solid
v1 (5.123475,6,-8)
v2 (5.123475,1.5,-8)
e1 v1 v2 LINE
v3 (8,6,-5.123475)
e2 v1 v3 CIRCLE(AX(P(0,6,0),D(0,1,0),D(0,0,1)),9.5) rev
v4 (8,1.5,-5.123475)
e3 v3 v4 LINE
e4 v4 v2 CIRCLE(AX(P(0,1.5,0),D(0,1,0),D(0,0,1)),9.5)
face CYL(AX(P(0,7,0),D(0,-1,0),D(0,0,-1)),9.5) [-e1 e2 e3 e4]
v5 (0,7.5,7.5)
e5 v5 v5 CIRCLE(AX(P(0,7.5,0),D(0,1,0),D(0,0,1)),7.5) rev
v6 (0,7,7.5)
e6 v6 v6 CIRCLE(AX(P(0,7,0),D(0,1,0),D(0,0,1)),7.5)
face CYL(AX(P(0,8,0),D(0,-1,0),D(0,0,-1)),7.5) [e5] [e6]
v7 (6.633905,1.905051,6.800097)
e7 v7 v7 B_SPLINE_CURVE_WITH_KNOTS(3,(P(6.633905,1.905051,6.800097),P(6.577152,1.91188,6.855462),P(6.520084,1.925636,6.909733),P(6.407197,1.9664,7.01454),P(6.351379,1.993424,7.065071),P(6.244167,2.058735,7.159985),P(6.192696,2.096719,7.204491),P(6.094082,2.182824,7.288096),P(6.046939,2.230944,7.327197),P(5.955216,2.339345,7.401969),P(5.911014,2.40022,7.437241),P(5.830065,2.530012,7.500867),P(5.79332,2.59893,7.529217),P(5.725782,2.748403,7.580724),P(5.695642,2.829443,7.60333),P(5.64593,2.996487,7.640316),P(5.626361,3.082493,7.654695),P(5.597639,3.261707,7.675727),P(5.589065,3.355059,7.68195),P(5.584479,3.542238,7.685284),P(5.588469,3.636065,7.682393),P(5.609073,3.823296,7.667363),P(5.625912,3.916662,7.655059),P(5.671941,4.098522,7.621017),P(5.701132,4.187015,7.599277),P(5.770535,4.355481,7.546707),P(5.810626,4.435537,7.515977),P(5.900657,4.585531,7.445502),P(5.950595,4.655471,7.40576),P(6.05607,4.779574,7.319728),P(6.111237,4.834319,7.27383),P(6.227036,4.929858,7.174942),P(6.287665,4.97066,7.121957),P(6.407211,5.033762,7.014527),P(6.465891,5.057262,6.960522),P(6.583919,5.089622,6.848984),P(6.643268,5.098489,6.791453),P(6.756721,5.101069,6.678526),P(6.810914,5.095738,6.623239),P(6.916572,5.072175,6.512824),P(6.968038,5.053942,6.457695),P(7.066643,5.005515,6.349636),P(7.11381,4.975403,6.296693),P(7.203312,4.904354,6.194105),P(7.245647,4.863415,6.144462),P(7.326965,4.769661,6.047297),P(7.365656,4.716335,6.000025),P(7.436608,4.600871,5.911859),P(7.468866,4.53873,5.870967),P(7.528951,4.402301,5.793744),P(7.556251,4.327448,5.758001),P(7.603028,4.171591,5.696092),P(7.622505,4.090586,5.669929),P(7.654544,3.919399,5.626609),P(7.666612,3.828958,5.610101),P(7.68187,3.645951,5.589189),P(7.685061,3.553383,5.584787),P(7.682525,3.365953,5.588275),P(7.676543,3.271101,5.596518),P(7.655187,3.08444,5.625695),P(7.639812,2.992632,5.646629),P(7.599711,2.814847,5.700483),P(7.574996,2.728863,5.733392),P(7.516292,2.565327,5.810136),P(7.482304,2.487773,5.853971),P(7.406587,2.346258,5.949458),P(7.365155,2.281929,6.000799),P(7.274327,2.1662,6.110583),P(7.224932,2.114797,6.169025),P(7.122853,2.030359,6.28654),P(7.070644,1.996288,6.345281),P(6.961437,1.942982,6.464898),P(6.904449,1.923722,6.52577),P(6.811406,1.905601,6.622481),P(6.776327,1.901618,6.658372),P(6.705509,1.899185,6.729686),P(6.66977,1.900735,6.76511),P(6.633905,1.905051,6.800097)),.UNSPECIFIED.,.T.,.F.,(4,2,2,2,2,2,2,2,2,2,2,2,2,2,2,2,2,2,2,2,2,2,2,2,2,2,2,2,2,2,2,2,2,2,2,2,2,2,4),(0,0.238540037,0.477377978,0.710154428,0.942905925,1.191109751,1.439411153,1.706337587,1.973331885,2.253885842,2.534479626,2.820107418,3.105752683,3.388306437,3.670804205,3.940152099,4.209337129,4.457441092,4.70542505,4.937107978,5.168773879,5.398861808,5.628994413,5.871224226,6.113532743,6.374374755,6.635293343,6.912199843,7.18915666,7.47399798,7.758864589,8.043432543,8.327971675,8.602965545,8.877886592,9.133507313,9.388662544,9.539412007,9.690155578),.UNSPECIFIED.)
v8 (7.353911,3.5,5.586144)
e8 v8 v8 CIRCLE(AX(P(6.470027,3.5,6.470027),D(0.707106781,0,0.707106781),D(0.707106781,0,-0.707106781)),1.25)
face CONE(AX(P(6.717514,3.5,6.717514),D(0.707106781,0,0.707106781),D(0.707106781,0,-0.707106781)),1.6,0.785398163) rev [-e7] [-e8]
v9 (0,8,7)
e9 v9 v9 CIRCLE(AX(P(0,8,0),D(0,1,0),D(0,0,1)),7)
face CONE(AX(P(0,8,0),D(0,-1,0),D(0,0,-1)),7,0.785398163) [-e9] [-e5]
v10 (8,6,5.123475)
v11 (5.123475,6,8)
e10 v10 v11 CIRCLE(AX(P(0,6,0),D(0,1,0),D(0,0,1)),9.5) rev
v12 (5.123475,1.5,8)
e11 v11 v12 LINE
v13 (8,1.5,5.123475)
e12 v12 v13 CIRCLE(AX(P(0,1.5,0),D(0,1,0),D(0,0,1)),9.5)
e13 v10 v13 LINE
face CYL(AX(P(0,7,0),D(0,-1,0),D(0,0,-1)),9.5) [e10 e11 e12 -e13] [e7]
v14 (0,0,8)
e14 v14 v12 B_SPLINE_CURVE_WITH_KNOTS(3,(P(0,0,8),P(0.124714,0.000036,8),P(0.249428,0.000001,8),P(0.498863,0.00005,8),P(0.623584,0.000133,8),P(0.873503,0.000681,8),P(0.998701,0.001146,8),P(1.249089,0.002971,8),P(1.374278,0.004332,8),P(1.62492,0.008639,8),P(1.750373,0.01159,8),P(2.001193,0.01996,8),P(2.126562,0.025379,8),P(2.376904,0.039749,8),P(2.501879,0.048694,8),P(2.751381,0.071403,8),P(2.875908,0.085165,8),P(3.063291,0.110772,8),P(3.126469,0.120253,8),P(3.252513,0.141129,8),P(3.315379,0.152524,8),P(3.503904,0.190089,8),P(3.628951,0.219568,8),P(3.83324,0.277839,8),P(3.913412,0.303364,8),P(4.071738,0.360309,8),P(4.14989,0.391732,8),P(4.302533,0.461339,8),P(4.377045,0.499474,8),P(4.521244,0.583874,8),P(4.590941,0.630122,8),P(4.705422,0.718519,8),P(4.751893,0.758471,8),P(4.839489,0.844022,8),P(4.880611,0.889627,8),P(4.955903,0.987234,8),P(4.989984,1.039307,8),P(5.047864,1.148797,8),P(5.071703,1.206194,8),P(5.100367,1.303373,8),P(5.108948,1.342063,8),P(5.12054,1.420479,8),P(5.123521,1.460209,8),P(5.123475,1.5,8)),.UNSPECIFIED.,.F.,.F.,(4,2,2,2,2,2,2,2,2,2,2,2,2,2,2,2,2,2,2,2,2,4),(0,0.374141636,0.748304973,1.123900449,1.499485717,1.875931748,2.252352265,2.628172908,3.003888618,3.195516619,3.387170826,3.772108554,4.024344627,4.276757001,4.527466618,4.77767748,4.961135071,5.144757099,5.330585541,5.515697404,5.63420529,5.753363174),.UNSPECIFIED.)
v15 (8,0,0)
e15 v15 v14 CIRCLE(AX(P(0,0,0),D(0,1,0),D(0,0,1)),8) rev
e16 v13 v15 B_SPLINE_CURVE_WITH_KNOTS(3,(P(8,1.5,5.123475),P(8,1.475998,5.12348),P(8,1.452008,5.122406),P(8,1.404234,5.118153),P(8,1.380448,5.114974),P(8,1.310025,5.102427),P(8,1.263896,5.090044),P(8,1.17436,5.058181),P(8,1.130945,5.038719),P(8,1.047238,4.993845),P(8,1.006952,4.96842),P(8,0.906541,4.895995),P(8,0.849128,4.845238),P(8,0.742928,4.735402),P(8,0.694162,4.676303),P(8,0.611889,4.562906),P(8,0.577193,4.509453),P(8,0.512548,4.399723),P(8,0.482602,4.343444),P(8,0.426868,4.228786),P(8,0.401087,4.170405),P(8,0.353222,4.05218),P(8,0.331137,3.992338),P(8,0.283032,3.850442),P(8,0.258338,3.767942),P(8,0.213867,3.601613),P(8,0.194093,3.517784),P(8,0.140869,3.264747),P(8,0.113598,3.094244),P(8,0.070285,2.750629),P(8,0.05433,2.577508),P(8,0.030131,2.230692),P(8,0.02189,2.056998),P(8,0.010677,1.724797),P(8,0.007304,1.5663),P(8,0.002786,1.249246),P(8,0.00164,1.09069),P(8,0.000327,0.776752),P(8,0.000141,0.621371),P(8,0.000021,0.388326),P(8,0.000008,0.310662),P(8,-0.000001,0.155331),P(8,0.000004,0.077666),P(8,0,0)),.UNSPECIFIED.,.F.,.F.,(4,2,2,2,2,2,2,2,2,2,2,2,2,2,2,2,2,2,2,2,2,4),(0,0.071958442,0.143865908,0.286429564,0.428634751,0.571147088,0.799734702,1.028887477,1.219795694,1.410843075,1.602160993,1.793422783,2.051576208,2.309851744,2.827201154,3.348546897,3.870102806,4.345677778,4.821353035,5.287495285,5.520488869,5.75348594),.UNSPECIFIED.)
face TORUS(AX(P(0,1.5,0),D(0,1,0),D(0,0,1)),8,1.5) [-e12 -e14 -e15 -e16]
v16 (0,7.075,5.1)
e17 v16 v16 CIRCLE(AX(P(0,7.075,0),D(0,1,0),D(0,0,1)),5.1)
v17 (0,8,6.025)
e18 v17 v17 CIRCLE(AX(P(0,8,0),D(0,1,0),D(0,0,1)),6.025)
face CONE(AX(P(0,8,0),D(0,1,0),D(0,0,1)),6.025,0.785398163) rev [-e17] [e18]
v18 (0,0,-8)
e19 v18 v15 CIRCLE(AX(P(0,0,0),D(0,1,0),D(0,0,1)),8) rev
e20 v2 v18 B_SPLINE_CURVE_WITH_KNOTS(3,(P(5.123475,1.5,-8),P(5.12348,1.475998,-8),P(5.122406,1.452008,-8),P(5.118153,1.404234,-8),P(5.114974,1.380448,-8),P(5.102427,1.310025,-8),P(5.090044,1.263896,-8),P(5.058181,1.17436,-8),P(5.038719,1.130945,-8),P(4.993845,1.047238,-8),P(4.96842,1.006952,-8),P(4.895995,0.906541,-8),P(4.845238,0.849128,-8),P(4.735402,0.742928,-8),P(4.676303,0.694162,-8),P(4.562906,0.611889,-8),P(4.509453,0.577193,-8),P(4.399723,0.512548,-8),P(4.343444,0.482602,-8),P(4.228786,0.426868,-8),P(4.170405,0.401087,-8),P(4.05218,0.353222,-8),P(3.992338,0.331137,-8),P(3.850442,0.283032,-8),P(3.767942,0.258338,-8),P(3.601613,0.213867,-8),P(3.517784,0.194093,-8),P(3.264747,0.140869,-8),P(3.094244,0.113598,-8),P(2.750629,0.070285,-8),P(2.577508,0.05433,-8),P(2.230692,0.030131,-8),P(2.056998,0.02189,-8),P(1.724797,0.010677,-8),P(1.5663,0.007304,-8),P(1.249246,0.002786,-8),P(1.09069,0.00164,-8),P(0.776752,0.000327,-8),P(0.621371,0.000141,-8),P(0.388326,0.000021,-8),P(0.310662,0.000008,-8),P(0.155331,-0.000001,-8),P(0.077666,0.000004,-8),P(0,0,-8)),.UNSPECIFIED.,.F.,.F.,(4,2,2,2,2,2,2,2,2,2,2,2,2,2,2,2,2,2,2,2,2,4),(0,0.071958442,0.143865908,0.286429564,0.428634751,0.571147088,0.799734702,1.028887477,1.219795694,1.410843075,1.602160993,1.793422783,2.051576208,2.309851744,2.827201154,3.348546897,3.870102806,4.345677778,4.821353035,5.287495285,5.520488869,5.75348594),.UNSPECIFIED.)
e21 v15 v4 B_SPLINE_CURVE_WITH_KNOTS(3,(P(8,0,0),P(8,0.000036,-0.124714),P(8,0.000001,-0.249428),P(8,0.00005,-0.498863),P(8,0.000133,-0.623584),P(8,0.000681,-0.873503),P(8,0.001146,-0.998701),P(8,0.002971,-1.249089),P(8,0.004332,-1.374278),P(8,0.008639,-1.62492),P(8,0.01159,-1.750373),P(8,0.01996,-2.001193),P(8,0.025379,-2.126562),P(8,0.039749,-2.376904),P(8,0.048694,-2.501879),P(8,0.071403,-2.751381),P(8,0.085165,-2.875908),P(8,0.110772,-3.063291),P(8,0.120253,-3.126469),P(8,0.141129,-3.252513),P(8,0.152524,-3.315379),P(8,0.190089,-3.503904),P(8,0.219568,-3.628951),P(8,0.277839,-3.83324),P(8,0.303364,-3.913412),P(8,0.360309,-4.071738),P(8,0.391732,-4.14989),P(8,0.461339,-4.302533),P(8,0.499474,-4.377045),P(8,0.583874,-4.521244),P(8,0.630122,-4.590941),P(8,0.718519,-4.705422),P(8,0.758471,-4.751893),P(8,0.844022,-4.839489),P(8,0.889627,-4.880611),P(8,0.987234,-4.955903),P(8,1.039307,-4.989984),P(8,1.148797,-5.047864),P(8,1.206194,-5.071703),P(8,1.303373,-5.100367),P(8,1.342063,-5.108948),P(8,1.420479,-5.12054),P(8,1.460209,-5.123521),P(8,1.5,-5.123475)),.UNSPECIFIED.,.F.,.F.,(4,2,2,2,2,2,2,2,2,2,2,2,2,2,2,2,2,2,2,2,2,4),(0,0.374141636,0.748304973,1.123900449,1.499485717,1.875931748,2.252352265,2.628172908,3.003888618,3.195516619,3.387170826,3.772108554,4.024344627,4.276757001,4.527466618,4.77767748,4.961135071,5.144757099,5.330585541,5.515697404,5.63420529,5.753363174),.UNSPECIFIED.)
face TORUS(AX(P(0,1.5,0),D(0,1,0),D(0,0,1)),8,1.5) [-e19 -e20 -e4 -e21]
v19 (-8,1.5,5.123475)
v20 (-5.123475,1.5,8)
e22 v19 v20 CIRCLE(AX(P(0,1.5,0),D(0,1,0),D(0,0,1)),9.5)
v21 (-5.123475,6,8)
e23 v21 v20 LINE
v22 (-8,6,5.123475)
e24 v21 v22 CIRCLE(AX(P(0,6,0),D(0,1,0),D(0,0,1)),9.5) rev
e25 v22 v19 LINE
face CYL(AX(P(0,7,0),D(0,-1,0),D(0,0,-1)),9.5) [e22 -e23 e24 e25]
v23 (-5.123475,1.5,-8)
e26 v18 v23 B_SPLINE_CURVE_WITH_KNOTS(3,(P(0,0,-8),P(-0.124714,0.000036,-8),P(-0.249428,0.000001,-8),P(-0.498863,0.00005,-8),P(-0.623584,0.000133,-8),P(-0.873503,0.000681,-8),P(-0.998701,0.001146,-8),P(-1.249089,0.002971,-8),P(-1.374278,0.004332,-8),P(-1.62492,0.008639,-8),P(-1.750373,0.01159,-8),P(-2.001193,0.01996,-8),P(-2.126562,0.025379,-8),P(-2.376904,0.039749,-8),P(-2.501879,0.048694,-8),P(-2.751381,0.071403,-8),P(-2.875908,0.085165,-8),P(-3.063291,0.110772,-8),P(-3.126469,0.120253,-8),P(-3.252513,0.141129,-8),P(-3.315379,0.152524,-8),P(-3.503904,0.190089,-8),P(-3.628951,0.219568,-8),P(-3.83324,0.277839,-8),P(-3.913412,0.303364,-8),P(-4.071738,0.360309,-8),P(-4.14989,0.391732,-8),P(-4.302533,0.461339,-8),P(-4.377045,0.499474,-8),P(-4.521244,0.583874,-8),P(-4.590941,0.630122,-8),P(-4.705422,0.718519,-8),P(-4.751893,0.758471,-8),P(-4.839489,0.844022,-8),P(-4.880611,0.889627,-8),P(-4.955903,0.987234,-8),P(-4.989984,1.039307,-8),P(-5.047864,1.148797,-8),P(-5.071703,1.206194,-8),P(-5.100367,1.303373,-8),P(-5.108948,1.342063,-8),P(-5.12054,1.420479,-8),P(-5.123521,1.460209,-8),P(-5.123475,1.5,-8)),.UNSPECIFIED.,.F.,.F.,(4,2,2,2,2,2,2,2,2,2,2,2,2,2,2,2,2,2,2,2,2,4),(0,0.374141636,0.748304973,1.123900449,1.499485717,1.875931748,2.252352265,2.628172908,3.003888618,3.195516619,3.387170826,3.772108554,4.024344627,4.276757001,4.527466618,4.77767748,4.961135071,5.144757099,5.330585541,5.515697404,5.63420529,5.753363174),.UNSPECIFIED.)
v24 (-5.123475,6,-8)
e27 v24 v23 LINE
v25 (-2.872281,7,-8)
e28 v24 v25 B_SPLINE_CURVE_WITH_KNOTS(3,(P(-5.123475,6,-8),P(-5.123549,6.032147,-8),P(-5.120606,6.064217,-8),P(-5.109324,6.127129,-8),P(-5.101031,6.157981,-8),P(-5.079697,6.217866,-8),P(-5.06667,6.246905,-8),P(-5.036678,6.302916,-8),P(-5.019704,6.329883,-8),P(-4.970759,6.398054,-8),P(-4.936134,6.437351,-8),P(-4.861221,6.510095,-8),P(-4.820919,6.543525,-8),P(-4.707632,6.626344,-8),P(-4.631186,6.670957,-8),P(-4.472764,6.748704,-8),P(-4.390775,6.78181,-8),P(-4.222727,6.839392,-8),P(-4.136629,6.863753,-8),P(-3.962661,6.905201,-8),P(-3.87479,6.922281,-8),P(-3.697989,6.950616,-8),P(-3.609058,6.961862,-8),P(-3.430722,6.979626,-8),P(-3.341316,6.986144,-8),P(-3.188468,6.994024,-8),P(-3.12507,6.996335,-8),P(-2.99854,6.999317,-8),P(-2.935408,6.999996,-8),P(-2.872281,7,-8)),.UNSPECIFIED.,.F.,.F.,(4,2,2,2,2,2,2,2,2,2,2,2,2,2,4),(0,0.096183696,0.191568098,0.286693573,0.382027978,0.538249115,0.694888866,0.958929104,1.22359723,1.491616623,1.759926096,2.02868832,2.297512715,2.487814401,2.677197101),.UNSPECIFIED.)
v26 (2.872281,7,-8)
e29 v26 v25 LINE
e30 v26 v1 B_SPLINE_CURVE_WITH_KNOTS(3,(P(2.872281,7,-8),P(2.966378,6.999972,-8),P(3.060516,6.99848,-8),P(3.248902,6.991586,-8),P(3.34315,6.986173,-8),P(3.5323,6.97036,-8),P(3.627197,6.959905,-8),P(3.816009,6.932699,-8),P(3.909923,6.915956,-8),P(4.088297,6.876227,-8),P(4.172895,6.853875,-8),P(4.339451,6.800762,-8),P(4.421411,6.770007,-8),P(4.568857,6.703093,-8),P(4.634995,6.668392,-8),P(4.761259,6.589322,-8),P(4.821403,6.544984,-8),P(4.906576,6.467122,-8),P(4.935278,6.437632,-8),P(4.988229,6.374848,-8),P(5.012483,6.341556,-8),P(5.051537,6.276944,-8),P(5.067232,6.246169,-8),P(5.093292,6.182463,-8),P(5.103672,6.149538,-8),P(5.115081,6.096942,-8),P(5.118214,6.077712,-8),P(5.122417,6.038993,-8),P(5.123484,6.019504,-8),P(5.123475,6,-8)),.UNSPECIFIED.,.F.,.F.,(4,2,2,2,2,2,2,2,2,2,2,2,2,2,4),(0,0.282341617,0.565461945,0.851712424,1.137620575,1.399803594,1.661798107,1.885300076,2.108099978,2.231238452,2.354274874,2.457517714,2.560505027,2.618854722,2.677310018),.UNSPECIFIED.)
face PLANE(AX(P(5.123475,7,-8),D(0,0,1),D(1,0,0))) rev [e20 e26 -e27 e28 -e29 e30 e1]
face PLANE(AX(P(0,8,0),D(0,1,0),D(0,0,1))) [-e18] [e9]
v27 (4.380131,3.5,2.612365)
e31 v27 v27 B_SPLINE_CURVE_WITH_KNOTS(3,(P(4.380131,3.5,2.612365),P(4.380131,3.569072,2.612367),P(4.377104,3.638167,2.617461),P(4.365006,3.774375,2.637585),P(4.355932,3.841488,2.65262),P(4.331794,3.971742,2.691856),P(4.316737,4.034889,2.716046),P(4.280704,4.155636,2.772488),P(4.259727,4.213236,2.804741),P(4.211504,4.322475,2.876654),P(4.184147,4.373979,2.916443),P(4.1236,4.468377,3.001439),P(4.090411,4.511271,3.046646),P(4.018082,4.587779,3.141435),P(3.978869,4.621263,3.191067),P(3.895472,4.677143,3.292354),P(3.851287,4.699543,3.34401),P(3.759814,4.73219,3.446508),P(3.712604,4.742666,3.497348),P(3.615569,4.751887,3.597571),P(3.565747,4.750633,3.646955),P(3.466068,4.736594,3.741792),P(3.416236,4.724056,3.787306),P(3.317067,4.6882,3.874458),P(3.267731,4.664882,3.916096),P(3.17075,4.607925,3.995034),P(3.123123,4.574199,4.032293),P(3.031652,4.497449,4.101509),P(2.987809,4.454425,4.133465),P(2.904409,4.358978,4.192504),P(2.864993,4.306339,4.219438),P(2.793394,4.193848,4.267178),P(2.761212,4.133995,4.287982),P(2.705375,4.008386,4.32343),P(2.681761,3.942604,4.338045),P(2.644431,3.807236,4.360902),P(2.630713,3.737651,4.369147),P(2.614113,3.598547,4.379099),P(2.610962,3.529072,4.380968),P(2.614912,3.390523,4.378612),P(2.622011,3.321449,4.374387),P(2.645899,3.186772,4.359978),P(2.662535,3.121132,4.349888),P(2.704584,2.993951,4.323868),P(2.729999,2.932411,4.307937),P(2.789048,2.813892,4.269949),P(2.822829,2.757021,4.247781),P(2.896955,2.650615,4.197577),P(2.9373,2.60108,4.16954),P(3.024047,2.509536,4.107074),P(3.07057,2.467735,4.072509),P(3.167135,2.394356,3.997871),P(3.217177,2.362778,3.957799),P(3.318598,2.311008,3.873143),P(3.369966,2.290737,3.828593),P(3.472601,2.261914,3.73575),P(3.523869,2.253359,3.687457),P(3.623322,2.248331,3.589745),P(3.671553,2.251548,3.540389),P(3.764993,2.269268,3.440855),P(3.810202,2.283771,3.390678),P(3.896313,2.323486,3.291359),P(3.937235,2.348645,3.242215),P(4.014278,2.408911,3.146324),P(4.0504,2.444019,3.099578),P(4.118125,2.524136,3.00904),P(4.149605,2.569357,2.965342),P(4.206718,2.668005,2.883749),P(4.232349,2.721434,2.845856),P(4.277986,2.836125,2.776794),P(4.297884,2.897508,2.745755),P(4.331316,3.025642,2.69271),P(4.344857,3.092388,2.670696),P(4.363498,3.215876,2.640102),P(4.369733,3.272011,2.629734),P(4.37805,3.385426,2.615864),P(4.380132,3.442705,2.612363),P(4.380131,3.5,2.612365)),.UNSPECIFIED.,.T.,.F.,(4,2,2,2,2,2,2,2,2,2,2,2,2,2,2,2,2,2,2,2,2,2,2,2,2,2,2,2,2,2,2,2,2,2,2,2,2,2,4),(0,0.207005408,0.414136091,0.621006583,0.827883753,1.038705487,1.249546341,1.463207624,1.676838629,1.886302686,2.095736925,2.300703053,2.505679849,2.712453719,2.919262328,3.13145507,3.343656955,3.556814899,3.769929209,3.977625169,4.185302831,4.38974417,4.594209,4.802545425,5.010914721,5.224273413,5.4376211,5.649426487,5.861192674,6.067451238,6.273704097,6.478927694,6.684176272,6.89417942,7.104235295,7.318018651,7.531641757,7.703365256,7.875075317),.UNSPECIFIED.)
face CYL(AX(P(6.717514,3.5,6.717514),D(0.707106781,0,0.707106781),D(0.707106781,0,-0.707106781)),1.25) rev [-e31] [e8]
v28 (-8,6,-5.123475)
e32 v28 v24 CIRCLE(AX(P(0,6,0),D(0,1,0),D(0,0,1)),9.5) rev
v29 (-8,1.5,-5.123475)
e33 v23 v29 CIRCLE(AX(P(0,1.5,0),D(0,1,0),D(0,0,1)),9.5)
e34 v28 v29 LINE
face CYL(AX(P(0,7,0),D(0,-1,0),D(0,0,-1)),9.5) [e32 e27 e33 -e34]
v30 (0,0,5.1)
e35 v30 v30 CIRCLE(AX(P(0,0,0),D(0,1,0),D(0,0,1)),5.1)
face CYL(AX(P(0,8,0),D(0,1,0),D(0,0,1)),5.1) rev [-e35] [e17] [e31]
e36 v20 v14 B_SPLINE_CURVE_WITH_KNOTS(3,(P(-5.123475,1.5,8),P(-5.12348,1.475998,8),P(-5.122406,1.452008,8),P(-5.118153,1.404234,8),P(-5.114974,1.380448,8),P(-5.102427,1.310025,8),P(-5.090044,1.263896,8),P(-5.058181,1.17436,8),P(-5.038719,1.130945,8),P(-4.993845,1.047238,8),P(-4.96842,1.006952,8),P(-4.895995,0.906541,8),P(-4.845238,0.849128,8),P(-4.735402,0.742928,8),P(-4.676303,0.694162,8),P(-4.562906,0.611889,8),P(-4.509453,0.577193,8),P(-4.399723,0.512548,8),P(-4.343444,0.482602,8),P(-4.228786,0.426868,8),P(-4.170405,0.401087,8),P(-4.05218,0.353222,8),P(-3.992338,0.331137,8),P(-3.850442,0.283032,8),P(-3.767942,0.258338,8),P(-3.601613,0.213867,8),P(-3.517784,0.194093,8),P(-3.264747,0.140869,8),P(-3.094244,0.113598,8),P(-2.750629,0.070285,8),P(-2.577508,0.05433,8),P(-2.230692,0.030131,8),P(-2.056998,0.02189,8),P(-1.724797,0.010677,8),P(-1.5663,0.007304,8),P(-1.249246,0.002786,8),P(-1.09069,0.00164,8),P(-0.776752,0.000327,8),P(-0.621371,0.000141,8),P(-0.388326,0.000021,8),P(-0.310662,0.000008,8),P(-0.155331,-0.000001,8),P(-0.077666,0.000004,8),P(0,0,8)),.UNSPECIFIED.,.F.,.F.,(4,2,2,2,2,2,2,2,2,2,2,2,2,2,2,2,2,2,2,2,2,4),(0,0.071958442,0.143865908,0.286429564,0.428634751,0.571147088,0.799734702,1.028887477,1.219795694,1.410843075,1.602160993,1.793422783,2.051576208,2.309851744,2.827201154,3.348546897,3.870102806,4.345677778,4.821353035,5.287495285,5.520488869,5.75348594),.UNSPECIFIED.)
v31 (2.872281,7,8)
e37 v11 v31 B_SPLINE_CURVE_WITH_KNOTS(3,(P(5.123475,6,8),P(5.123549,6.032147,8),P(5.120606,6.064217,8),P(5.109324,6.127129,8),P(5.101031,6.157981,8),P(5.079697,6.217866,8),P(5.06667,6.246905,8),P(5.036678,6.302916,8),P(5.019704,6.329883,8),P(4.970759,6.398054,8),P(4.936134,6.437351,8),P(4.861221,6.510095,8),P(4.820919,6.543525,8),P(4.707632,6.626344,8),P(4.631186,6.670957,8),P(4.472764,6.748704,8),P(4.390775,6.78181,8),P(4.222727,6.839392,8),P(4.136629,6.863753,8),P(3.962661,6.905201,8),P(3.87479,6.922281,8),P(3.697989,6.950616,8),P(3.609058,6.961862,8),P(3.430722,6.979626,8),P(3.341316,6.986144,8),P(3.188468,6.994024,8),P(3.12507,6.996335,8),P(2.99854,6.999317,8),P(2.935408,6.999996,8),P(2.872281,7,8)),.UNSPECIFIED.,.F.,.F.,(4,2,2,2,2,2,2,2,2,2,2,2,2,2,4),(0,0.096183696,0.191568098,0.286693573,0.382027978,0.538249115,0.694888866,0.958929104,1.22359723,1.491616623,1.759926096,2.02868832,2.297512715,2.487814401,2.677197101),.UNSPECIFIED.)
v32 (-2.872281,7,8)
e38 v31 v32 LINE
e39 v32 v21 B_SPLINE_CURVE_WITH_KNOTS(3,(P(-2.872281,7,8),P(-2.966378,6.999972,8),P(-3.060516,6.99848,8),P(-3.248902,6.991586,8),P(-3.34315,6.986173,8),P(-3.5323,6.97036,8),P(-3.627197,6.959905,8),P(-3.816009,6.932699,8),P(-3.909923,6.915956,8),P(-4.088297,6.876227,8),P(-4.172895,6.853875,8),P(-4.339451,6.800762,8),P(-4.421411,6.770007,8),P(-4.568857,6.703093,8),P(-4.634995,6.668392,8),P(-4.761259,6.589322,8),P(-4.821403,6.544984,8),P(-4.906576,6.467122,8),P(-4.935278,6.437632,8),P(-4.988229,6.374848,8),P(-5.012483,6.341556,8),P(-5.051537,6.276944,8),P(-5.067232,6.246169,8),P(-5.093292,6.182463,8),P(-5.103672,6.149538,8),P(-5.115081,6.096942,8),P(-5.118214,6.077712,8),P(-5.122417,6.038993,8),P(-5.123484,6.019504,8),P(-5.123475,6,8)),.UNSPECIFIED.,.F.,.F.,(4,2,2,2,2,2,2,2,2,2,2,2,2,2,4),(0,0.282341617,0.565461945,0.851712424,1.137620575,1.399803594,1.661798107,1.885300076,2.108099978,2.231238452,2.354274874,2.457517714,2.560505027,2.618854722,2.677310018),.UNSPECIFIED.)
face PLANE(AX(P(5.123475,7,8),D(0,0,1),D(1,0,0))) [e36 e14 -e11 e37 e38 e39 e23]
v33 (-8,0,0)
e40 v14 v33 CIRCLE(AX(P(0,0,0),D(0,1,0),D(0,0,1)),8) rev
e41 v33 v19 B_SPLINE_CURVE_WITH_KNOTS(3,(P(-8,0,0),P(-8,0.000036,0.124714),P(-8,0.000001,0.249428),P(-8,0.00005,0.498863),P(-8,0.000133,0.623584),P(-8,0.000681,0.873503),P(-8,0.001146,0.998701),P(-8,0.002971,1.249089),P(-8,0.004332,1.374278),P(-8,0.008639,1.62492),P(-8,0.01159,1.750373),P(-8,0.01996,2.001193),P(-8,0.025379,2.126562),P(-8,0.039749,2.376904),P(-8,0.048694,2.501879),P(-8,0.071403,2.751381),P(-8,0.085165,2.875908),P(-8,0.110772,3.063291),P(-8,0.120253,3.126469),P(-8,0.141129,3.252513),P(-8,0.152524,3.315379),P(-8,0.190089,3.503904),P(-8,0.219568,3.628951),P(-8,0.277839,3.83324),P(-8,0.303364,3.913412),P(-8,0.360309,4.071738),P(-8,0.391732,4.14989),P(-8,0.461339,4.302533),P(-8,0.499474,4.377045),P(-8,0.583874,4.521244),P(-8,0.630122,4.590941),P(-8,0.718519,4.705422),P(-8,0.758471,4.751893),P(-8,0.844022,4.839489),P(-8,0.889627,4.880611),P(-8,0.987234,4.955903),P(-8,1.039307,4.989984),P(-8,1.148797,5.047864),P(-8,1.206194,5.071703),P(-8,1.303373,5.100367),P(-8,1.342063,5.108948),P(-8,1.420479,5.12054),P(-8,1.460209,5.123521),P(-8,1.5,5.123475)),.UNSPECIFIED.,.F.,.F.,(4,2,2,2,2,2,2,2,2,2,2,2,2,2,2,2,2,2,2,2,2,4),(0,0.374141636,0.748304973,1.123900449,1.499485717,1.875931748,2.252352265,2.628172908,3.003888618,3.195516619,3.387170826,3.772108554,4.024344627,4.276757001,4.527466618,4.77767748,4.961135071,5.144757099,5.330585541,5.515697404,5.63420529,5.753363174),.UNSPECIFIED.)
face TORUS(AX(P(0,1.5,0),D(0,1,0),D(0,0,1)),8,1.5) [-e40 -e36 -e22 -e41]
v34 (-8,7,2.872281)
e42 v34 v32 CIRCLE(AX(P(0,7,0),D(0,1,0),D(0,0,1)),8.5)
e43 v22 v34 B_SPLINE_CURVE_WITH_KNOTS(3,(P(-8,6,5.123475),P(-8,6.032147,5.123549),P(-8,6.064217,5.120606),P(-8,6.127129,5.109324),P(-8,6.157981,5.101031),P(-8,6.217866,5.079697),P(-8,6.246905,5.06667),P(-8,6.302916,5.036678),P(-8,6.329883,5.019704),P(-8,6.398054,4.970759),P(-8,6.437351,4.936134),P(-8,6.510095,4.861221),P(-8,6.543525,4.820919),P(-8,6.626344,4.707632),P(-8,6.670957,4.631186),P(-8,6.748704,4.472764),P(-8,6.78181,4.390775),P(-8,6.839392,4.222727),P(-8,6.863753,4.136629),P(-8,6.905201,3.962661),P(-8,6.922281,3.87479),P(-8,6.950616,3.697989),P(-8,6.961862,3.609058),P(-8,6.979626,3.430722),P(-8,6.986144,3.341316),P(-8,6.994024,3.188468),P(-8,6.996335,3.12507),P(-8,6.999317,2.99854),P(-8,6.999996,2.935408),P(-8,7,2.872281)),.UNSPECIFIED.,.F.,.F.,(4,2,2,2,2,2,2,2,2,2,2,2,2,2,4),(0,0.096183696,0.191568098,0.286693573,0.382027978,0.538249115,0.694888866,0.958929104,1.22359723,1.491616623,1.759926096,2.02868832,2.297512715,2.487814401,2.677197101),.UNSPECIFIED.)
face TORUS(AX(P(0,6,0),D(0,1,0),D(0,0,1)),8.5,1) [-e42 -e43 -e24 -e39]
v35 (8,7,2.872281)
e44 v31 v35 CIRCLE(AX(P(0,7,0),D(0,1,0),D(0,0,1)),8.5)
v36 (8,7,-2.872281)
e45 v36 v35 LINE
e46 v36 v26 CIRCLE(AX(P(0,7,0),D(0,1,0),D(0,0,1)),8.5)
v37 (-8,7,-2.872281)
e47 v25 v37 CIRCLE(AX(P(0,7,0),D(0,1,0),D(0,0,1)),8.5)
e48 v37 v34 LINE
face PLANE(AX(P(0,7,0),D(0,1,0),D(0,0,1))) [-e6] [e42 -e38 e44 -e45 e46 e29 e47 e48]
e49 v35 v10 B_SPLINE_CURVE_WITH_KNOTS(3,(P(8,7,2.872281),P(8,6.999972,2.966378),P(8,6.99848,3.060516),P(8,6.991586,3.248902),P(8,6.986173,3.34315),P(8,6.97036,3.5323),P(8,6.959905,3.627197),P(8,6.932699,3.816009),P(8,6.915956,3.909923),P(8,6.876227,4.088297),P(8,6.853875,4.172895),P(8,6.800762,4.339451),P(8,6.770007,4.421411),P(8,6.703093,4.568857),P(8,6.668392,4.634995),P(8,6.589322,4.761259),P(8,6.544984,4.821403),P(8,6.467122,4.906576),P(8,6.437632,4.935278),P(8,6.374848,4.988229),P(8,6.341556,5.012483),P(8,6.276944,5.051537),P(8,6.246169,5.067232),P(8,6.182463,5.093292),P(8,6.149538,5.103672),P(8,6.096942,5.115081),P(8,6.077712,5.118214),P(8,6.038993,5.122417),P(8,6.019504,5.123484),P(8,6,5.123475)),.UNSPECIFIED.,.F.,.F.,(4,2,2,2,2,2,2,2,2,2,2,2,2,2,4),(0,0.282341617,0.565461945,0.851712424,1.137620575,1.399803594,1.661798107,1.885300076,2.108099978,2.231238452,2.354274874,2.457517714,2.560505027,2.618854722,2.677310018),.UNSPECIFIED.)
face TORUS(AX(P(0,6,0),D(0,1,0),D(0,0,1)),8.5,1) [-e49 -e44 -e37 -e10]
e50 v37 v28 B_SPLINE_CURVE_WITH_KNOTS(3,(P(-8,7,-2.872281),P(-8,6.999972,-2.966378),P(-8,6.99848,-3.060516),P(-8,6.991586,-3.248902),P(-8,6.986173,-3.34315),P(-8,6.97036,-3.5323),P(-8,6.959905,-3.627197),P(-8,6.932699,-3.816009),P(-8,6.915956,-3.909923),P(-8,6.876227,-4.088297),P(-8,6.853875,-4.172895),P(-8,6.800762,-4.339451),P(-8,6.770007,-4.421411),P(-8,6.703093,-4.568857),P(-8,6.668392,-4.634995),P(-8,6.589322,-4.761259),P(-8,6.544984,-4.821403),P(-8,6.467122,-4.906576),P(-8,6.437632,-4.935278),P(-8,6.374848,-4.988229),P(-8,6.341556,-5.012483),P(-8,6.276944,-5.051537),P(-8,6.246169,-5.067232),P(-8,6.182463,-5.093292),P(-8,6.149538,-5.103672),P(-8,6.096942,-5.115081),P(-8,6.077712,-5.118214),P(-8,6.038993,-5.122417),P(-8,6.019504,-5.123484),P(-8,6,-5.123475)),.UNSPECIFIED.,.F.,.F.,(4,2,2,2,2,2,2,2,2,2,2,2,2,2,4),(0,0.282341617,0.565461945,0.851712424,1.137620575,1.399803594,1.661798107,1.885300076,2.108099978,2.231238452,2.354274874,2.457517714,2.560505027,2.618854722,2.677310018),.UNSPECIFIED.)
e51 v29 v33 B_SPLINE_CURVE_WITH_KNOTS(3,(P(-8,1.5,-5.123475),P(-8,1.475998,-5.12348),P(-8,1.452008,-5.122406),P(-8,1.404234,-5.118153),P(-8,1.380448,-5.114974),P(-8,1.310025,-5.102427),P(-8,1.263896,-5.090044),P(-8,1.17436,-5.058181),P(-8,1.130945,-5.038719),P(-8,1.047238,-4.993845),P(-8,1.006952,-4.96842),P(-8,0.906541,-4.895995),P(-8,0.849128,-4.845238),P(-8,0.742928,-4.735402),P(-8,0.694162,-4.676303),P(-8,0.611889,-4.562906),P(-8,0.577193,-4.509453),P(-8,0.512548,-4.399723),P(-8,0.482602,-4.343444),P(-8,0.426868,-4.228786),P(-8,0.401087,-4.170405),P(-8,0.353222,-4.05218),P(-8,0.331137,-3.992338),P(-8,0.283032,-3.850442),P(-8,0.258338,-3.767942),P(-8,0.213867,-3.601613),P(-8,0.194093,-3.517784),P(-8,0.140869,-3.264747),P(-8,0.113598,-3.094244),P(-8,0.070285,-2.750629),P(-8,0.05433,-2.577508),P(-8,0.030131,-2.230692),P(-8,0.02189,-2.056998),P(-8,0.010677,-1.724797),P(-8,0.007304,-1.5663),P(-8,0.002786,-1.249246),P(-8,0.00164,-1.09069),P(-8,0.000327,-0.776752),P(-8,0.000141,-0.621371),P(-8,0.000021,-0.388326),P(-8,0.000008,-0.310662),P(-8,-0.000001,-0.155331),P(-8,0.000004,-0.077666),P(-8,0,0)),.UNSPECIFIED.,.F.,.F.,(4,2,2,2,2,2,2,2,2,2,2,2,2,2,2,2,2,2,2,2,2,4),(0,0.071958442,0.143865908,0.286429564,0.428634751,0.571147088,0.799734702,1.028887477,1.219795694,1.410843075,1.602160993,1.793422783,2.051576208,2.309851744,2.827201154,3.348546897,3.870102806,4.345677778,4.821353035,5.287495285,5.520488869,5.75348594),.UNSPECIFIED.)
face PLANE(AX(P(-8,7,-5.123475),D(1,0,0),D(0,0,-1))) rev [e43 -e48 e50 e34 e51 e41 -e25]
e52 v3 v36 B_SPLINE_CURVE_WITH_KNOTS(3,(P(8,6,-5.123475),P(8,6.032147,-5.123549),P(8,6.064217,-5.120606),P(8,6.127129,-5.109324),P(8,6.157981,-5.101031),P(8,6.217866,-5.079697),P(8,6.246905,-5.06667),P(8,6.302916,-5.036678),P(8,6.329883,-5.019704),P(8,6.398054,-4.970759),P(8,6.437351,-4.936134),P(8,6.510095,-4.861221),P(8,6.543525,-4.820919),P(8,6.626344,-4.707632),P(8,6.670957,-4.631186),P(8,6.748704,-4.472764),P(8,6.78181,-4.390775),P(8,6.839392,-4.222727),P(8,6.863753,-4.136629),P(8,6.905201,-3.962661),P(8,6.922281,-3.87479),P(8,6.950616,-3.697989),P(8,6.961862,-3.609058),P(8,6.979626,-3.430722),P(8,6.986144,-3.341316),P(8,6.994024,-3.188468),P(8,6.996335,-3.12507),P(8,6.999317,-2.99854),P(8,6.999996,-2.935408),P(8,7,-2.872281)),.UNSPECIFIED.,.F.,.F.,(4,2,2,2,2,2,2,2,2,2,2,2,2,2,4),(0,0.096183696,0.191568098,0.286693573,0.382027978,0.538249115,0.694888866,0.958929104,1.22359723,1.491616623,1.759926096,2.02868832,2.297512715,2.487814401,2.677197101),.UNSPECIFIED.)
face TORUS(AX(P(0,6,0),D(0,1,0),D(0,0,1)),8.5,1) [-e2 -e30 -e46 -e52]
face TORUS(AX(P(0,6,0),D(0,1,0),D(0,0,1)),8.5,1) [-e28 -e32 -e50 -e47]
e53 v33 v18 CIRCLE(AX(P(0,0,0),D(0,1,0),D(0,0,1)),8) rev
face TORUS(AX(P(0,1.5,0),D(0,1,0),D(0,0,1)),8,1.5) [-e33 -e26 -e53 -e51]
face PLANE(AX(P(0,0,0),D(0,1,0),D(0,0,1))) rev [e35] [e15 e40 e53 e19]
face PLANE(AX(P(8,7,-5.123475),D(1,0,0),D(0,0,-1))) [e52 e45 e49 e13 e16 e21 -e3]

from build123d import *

# Parameters (mm, degrees)
RESSALTO_EXTRUS_O1_DEPTH         = 7
ESBO_O2_R                        = 7.5
RESSALTO_EXTRUS_O2_DEPTH         = 1
FURO_ROSCADO_DE_M121_D           = 10.2
FURO_ROSCADO_DE_M121_CSINK_D     = 12.05
FURO_ROSCADO_DE_M121_CSINK_ANGLE = 90
FILETE1_R                        = 1
FILETE2_R                        = 1.5
CHANFRO1_SIZE                    = 0.5


# Read off the part's stored shape, not the designer's step: Furo roscado de M32
with BuildPart() as part:
    # Esboço1 → Ressalto-extrusão1 (new body)
    with BuildSketch(Plane(origin=(0, 0, 0), x_dir=(1, 0, 0), z_dir=(0, 1, 0))):
        with BuildLine():
            Line((5.123475383, 8), (-5.123475383, 8))
            ThreePointArc((-5.123475383, 8), (-6.717514421, 6.717514421), (-8, 5.123475383))
            Line((-8, 5.123475383), (-8, -5.123475383))
            ThreePointArc((-8, -5.123475383), (-6.717514421, -6.717514421), (-5.123475383, -8))
            Line((-5.123475383, -8), (5.123475383, -8))
            ThreePointArc((5.123475383, -8), (6.717514421, -6.717514421), (8, -5.123475383))
            Line((8, -5.123475383), (8, 5.123475383))
            ThreePointArc((8, 5.123475383), (6.717514421, 6.717514421), (5.123475383, 8))
        make_face()
    extrude(amount=RESSALTO_EXTRUS_O1_DEPTH)

    # Esboço2 → Ressalto-extrusão2 (add)
    with BuildSketch(Plane(origin=(0, 7, 0), x_dir=(1, 0, 0), z_dir=(0, 1, 0))):
        with Locations(Location((0, 0, 0), (0, 0, 270))):
            Circle(ESBO_O2_R)
    extrude(amount=RESSALTO_EXTRUS_O2_DEPTH)

    # Furo roscado de M121 (through all)
    with Locations(Plane(origin=(0, 8, 0), x_dir=(1, 0, 0), z_dir=(0, 1, 0))):
        with Locations((0, 0)):
            CounterSinkHole(FURO_ROSCADO_DE_M121_D / 2, FURO_ROSCADO_DE_M121_CSINK_D / 2, counter_sink_angle=FURO_ROSCADO_DE_M121_CSINK_ANGLE)

    # Filete1
    filete1_edges = [part.edges().sort_by_distance(p)[0] for p in [
        (6.717514421, 7, 6.717514421),
        (6.717514421, 7, -6.717514421),
        (-6.717514421, 7, -6.717514421),
        (-6.717514421, 7, 6.717514421),
    ]]
    fillet(filete1_edges, radius=FILETE1_R)

    # Filete2
    filete2_edges = [part.edges().sort_by_distance(p)[0] for p in [
        (6.717514421, 0, -6.717514421),
        (-6.717514421, 0, -6.717514421),
        (-6.717514421, 0, 6.717514421),
        (6.717514421, 0, 6.717514421),
    ]]
    fillet(filete2_edges, radius=FILETE2_R - 0.0001)  # a hair under: the kernel refuses the full size

    # Chanfro1
    chanfro1_edges = [part.edges().sort_by_distance(p)[0] for p in [
        (0, 8, -7.5),
    ]]
    chamfer(chanfro1_edges, length=CHANFRO1_SIZE)

    # Furo roscado de M32 outline → Furo roscado de M32 (revolve, cut)
    with BuildSketch(Plane(origin=(0, 3.5, 0), x_dir=(0.707106781186546, 0, -0.707106781186549), z_dir=(0, -1, 0))):
        Polygon((1.600067365, 9.500067365), (0, 9.500067365), (0, 4.944353867), (1.25, 4.944353867), (1.25, 9.15), align=None)
    revolve(axis=Axis((0, 3.5, 0), (0.707106781186549, 0, 0.707106781186546)), mode=Mode.SUBTRACT)


solid = part.part
